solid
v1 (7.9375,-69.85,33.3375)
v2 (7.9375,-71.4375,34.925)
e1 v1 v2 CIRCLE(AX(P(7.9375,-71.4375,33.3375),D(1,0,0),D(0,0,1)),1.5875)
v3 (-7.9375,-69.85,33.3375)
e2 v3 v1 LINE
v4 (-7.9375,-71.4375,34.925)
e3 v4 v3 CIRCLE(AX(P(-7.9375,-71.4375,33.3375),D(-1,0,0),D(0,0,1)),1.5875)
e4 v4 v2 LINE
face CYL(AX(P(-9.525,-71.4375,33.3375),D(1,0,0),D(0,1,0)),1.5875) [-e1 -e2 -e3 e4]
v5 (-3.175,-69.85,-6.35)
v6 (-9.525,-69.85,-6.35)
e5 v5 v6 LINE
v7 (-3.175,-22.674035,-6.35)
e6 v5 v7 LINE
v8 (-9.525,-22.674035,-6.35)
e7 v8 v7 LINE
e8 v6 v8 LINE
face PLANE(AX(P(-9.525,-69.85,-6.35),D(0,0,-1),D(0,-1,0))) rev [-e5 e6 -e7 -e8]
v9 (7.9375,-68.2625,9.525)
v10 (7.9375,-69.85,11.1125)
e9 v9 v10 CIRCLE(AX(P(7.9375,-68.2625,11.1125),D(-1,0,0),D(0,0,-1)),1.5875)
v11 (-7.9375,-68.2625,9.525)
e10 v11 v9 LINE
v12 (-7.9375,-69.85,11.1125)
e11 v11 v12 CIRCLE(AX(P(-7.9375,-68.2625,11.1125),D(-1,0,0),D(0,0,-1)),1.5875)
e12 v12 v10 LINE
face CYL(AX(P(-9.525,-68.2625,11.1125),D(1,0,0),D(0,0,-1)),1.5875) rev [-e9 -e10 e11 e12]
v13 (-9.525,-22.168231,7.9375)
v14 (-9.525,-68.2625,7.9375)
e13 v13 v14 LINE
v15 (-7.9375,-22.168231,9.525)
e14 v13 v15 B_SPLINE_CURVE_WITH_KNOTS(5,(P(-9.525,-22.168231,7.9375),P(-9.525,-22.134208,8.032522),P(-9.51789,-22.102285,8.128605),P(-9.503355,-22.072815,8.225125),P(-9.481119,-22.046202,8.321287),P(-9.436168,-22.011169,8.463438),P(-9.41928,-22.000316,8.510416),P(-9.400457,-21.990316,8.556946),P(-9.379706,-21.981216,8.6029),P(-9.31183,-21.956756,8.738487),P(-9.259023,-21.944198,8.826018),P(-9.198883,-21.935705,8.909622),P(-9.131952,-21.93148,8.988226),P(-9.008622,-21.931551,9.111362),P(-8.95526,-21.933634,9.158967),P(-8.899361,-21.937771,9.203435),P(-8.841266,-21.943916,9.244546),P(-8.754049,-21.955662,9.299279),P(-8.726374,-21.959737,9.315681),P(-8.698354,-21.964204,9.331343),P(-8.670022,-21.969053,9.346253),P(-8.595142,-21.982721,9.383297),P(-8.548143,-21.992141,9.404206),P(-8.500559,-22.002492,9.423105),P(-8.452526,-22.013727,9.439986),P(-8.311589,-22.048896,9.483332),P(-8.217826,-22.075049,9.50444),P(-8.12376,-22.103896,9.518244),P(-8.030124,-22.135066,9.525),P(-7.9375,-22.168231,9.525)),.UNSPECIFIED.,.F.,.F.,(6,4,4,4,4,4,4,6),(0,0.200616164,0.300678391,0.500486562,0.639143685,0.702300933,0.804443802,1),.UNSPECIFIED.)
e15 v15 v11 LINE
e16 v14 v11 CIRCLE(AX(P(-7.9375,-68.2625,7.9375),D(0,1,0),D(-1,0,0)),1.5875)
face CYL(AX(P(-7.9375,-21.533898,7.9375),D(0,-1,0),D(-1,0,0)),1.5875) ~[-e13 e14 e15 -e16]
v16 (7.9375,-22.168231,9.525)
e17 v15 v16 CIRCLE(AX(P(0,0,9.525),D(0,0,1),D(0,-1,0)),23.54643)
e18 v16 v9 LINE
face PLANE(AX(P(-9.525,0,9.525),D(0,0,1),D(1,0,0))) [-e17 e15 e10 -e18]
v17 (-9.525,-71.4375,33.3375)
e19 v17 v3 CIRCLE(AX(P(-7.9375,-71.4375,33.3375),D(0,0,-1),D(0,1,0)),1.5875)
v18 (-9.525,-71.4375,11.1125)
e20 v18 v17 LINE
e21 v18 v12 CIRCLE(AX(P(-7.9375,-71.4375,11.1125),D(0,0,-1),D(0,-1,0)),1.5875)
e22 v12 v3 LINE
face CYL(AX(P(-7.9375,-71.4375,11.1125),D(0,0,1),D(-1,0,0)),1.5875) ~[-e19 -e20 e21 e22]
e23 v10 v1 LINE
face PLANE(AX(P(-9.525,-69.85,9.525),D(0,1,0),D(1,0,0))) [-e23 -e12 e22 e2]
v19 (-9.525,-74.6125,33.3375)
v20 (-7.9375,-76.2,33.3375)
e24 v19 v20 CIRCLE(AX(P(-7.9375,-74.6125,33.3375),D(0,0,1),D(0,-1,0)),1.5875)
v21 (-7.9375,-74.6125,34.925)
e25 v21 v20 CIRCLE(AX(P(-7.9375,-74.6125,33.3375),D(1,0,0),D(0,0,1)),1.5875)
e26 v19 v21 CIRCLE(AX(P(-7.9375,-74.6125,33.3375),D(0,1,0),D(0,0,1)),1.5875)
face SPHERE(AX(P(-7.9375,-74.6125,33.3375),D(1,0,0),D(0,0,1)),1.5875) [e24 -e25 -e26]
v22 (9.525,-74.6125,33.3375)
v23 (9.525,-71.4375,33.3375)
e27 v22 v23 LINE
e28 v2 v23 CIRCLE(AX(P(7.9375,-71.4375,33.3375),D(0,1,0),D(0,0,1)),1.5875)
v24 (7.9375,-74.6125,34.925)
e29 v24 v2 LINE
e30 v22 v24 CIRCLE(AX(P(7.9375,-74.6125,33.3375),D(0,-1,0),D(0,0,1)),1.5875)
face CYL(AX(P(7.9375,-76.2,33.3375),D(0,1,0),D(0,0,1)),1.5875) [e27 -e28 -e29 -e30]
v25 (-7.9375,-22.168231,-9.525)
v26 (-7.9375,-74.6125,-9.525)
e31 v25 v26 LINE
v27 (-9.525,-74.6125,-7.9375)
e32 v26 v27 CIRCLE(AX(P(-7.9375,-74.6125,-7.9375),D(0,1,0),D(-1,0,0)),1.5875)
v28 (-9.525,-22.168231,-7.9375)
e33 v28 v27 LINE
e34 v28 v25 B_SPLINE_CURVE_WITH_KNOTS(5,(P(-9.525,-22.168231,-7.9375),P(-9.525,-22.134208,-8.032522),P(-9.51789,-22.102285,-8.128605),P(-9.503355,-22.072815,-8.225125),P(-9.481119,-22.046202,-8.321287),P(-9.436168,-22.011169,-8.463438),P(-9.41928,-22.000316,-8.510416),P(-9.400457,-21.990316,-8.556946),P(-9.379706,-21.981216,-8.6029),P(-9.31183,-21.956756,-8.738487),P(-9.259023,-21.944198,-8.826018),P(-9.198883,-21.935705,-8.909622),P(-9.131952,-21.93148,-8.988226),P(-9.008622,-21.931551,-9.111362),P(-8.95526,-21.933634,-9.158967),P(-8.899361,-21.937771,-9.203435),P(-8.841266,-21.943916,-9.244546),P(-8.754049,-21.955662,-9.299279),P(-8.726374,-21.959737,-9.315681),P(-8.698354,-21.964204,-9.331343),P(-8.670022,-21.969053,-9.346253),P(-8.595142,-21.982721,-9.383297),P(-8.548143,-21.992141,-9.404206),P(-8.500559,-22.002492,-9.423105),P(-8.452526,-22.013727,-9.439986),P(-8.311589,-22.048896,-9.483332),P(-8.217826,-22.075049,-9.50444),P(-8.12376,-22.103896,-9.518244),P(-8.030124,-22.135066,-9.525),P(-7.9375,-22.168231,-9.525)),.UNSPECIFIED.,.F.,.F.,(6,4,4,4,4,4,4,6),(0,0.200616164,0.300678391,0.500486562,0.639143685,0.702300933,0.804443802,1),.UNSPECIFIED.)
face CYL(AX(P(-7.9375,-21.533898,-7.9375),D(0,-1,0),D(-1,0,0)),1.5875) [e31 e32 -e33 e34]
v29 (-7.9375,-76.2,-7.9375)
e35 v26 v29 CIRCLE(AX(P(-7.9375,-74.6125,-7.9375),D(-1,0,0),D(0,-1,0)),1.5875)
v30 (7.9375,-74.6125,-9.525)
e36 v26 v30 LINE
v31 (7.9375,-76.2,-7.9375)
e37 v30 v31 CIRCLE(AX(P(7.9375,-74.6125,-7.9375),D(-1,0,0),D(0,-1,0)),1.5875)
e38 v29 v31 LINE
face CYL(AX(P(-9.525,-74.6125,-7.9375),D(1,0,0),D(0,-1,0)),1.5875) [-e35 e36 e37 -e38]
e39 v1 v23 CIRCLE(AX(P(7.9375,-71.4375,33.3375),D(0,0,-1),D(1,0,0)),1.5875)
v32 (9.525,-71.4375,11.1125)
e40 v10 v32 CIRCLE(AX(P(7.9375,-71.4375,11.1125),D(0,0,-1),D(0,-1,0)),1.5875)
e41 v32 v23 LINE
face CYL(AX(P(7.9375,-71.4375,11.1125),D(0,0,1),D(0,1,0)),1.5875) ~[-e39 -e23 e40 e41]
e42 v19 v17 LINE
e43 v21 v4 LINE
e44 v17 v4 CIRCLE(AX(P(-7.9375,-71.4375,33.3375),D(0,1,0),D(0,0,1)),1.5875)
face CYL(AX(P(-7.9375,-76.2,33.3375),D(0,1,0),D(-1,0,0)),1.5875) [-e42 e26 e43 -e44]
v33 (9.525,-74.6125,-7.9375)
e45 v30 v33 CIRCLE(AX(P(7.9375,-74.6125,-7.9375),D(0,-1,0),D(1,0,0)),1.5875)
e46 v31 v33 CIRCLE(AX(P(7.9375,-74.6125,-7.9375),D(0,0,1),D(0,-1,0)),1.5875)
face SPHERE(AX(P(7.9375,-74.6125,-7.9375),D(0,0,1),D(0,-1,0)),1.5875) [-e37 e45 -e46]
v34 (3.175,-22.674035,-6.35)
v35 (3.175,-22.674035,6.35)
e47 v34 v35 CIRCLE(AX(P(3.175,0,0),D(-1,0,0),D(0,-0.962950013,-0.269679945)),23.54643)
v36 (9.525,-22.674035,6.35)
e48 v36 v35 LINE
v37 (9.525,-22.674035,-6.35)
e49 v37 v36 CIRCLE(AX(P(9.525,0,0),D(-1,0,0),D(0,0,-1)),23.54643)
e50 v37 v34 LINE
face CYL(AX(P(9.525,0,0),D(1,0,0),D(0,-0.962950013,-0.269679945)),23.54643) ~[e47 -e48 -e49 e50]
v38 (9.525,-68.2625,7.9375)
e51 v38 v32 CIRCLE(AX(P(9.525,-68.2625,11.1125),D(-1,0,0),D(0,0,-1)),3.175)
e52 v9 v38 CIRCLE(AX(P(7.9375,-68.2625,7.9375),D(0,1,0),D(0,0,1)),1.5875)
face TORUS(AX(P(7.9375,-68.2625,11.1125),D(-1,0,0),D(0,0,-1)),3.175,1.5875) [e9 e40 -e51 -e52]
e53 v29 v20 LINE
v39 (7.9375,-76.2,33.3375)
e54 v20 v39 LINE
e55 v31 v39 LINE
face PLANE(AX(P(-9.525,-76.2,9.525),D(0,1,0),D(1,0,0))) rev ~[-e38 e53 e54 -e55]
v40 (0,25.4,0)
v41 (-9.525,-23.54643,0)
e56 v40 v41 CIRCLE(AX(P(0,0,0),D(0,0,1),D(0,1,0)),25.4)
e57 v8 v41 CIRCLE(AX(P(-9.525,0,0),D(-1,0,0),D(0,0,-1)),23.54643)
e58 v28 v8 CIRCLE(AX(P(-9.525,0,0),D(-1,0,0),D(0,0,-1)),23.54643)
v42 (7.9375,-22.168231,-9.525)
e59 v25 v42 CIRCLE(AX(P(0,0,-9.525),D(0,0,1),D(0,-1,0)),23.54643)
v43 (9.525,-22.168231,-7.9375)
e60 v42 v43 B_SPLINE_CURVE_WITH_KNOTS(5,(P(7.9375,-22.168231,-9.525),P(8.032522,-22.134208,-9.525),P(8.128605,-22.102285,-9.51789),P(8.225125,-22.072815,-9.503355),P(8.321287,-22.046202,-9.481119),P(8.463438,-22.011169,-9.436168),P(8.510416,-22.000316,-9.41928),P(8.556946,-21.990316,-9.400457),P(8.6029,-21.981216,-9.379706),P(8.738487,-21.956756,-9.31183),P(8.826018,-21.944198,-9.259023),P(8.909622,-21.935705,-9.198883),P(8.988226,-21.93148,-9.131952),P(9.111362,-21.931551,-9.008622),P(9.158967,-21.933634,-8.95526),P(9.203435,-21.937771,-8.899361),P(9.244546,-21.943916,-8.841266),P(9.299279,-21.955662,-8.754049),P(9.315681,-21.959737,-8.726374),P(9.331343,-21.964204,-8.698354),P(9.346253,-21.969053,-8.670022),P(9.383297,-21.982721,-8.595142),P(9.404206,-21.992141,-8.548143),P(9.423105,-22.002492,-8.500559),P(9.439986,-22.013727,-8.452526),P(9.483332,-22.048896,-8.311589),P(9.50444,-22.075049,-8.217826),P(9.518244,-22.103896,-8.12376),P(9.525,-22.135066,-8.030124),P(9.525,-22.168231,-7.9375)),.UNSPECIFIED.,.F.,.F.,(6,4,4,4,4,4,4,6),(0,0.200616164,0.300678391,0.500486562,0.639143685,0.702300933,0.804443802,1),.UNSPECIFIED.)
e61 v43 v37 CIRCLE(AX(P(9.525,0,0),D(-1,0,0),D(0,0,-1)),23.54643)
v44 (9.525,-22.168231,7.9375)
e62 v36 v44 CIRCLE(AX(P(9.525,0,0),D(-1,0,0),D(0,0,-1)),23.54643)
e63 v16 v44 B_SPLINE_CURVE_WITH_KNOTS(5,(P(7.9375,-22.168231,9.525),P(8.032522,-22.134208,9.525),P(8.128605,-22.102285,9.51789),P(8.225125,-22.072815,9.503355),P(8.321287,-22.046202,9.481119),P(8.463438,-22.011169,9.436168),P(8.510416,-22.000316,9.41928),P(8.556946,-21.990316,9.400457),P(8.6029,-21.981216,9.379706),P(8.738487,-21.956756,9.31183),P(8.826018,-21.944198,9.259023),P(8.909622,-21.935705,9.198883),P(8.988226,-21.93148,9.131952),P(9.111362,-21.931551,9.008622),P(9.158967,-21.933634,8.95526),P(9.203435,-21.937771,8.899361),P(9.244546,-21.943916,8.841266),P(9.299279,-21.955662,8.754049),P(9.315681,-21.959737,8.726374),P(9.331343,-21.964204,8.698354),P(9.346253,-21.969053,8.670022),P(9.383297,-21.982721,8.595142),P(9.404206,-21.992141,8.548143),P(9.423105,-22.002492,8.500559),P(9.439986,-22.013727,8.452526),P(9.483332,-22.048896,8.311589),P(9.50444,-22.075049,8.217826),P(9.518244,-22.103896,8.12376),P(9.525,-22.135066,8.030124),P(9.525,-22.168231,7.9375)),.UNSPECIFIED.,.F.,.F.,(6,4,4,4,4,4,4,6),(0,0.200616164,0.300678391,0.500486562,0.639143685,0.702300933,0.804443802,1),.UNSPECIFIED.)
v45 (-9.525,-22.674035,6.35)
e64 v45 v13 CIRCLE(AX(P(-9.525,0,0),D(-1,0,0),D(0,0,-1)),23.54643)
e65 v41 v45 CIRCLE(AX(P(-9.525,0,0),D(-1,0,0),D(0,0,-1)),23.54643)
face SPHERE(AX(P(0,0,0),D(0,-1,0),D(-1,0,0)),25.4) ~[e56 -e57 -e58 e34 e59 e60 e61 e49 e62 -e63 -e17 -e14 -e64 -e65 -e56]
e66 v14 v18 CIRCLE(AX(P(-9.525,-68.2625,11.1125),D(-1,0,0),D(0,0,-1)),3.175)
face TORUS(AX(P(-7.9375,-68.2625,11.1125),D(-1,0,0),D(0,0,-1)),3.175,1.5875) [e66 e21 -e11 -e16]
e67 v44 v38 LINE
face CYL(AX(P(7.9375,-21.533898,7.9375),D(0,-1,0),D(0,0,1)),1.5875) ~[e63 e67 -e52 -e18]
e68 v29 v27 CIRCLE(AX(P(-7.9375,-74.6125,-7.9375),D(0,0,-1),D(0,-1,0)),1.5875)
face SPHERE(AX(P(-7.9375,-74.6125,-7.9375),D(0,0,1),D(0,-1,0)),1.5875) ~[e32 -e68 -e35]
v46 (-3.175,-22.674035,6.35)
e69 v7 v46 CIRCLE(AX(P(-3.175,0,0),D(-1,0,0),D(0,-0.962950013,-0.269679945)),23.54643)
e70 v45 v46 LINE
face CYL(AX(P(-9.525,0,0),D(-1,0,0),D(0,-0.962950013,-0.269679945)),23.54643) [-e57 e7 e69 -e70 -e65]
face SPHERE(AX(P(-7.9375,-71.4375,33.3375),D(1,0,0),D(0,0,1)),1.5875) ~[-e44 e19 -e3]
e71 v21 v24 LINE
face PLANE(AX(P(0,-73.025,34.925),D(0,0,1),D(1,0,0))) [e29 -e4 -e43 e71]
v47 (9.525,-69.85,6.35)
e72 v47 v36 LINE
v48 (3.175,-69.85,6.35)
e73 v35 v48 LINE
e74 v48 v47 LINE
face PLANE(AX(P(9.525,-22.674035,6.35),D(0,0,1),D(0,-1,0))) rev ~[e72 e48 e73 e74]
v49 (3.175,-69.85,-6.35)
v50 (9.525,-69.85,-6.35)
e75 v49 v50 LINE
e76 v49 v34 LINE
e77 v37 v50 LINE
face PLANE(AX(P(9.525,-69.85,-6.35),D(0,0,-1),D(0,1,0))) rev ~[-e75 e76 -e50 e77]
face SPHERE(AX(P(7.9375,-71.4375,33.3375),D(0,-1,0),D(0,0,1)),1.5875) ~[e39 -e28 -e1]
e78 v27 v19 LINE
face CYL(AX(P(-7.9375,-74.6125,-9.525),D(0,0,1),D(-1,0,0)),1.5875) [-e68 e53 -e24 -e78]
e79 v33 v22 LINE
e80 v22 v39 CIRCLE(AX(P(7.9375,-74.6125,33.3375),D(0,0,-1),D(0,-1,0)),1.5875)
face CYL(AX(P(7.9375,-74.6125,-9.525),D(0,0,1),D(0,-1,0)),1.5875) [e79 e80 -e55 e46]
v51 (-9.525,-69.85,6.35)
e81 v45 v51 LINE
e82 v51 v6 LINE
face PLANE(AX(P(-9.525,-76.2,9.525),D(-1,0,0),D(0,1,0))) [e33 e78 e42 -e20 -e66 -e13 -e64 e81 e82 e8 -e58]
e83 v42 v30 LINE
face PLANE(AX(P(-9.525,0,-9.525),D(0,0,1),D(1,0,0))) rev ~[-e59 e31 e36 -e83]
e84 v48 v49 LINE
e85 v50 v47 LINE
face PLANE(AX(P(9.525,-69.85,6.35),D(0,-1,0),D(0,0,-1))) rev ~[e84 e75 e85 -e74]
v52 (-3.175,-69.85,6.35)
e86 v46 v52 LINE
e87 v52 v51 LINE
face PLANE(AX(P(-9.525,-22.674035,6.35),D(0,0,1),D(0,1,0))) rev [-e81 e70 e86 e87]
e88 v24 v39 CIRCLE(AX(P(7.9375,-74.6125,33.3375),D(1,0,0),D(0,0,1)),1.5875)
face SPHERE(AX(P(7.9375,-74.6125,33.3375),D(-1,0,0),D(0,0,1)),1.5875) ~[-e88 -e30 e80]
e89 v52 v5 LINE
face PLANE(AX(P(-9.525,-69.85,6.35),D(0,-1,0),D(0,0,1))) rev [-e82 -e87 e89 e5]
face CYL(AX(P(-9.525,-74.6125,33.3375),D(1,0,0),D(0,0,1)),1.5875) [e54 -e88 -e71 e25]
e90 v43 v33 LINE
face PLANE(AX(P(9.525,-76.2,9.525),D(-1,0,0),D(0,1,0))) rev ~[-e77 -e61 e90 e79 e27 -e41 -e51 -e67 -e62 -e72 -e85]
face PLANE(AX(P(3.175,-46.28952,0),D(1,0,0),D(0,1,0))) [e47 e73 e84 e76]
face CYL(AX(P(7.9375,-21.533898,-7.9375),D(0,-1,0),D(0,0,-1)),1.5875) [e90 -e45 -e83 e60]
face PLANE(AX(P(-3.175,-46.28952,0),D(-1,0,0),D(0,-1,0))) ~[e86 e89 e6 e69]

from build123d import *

# Parameters (mm, degrees)
F2_W     = 19.05
F2_H     = 19.05
F3_DEPTH = 76.2
F4_W     = 19.05
F4_H     = 6.35
F5_DEPTH = 25.4
F7_DEPTH = 6.35
F10_F1_R = 1.5875
F10_F2_R = 1.5875


with BuildPart() as f1:
    # F0 (on Top) → F1 (revolve)
    with BuildSketch(Plane.XY):
        with BuildLine():
            Line((0, -25.4), (0, 25.4))
            ThreePointArc((0, 25.4), (-25.4, 0), (0, -25.4))
        make_face()
    revolve(axis=Axis((0, -0.8307937533, 0), (0, 1, 0)))

    # F2 (on Front) → F3 (join)
    with BuildSketch(Plane.XZ):
        Rectangle(F2_W, F2_H)
    extrude(amount=F3_DEPTH)

    # F4 (on face) → F5 (join)
    with BuildSketch(Plane.XY.offset(9.525)):
        with Locations((0, -73.025)):
            Rectangle(F4_W, F4_H)
    extrude(amount=F5_DEPTH)


with BuildPart() as f7:
    # F6 (on face) → F7 (new body, symmetric)
    with BuildSketch(Plane.YZ.offset(9.525)):
        with BuildLine():
            Line((-22.6740352606, 6.35), (-69.85, 6.35))
            Line((-69.85, 6.35), (-69.85, -6.35))
            Line((-69.85, -6.35), (-22.6740352606, -6.35))
            ThreePointArc((-22.6740352606, -6.35), (-23.5464301965, 0), (-22.6740352606, 6.35))
        make_face()
    extrude(amount=F7_DEPTH, both=True)


with BuildPart() as f8_1:
    # F8: instance of F7
    add(f7.part.mirror(Plane.YZ))


with BuildPart() as f1_1:
    add(f1.part)

    # F9: cut F8_1, F7
    add(f8_1.part, mode=Mode.SUBTRACT)
    add(f7.part, mode=Mode.SUBTRACT)

    # F10: fillet of radius 1.5875 on 12 edges, made by hand

    # F10_f1
    f10_f1_edges = [f1_1.edges().sort_by_distance(p)[0] for p in [
        (0, -69.85, 9.525),
    ]]
    fillet(f10_f1_edges, radius=F10_F1_R)

    # F10_f2
    f10_f2_edges = [f1_1.edges().sort_by_distance(p)[0] for p in [
        (0, -76.2, 34.925),
        (9.525, -73.025, 34.925),
        (0, -69.85, 34.925),
        (-9.525, -73.025, 34.925),
        (9.525, -76.2, 12.7),
        (-9.525, -76.2, 12.7),
        (-9.525, -69.85, 23.01875),
        (9.525, -69.85, 23.01875),
        (0, -76.2, -9.525),
        (9.525, -48.8669488482, -9.525),
        (-9.525, -48.8669488482, -9.525),
        (9.525, -69.3850320151, 9.9899679849),
        (-9.525, -69.3850320151, 9.9899679849),
    ]]
    fillet(f10_f2_edges, radius=F10_F2_R)


solid = f1_1.part
